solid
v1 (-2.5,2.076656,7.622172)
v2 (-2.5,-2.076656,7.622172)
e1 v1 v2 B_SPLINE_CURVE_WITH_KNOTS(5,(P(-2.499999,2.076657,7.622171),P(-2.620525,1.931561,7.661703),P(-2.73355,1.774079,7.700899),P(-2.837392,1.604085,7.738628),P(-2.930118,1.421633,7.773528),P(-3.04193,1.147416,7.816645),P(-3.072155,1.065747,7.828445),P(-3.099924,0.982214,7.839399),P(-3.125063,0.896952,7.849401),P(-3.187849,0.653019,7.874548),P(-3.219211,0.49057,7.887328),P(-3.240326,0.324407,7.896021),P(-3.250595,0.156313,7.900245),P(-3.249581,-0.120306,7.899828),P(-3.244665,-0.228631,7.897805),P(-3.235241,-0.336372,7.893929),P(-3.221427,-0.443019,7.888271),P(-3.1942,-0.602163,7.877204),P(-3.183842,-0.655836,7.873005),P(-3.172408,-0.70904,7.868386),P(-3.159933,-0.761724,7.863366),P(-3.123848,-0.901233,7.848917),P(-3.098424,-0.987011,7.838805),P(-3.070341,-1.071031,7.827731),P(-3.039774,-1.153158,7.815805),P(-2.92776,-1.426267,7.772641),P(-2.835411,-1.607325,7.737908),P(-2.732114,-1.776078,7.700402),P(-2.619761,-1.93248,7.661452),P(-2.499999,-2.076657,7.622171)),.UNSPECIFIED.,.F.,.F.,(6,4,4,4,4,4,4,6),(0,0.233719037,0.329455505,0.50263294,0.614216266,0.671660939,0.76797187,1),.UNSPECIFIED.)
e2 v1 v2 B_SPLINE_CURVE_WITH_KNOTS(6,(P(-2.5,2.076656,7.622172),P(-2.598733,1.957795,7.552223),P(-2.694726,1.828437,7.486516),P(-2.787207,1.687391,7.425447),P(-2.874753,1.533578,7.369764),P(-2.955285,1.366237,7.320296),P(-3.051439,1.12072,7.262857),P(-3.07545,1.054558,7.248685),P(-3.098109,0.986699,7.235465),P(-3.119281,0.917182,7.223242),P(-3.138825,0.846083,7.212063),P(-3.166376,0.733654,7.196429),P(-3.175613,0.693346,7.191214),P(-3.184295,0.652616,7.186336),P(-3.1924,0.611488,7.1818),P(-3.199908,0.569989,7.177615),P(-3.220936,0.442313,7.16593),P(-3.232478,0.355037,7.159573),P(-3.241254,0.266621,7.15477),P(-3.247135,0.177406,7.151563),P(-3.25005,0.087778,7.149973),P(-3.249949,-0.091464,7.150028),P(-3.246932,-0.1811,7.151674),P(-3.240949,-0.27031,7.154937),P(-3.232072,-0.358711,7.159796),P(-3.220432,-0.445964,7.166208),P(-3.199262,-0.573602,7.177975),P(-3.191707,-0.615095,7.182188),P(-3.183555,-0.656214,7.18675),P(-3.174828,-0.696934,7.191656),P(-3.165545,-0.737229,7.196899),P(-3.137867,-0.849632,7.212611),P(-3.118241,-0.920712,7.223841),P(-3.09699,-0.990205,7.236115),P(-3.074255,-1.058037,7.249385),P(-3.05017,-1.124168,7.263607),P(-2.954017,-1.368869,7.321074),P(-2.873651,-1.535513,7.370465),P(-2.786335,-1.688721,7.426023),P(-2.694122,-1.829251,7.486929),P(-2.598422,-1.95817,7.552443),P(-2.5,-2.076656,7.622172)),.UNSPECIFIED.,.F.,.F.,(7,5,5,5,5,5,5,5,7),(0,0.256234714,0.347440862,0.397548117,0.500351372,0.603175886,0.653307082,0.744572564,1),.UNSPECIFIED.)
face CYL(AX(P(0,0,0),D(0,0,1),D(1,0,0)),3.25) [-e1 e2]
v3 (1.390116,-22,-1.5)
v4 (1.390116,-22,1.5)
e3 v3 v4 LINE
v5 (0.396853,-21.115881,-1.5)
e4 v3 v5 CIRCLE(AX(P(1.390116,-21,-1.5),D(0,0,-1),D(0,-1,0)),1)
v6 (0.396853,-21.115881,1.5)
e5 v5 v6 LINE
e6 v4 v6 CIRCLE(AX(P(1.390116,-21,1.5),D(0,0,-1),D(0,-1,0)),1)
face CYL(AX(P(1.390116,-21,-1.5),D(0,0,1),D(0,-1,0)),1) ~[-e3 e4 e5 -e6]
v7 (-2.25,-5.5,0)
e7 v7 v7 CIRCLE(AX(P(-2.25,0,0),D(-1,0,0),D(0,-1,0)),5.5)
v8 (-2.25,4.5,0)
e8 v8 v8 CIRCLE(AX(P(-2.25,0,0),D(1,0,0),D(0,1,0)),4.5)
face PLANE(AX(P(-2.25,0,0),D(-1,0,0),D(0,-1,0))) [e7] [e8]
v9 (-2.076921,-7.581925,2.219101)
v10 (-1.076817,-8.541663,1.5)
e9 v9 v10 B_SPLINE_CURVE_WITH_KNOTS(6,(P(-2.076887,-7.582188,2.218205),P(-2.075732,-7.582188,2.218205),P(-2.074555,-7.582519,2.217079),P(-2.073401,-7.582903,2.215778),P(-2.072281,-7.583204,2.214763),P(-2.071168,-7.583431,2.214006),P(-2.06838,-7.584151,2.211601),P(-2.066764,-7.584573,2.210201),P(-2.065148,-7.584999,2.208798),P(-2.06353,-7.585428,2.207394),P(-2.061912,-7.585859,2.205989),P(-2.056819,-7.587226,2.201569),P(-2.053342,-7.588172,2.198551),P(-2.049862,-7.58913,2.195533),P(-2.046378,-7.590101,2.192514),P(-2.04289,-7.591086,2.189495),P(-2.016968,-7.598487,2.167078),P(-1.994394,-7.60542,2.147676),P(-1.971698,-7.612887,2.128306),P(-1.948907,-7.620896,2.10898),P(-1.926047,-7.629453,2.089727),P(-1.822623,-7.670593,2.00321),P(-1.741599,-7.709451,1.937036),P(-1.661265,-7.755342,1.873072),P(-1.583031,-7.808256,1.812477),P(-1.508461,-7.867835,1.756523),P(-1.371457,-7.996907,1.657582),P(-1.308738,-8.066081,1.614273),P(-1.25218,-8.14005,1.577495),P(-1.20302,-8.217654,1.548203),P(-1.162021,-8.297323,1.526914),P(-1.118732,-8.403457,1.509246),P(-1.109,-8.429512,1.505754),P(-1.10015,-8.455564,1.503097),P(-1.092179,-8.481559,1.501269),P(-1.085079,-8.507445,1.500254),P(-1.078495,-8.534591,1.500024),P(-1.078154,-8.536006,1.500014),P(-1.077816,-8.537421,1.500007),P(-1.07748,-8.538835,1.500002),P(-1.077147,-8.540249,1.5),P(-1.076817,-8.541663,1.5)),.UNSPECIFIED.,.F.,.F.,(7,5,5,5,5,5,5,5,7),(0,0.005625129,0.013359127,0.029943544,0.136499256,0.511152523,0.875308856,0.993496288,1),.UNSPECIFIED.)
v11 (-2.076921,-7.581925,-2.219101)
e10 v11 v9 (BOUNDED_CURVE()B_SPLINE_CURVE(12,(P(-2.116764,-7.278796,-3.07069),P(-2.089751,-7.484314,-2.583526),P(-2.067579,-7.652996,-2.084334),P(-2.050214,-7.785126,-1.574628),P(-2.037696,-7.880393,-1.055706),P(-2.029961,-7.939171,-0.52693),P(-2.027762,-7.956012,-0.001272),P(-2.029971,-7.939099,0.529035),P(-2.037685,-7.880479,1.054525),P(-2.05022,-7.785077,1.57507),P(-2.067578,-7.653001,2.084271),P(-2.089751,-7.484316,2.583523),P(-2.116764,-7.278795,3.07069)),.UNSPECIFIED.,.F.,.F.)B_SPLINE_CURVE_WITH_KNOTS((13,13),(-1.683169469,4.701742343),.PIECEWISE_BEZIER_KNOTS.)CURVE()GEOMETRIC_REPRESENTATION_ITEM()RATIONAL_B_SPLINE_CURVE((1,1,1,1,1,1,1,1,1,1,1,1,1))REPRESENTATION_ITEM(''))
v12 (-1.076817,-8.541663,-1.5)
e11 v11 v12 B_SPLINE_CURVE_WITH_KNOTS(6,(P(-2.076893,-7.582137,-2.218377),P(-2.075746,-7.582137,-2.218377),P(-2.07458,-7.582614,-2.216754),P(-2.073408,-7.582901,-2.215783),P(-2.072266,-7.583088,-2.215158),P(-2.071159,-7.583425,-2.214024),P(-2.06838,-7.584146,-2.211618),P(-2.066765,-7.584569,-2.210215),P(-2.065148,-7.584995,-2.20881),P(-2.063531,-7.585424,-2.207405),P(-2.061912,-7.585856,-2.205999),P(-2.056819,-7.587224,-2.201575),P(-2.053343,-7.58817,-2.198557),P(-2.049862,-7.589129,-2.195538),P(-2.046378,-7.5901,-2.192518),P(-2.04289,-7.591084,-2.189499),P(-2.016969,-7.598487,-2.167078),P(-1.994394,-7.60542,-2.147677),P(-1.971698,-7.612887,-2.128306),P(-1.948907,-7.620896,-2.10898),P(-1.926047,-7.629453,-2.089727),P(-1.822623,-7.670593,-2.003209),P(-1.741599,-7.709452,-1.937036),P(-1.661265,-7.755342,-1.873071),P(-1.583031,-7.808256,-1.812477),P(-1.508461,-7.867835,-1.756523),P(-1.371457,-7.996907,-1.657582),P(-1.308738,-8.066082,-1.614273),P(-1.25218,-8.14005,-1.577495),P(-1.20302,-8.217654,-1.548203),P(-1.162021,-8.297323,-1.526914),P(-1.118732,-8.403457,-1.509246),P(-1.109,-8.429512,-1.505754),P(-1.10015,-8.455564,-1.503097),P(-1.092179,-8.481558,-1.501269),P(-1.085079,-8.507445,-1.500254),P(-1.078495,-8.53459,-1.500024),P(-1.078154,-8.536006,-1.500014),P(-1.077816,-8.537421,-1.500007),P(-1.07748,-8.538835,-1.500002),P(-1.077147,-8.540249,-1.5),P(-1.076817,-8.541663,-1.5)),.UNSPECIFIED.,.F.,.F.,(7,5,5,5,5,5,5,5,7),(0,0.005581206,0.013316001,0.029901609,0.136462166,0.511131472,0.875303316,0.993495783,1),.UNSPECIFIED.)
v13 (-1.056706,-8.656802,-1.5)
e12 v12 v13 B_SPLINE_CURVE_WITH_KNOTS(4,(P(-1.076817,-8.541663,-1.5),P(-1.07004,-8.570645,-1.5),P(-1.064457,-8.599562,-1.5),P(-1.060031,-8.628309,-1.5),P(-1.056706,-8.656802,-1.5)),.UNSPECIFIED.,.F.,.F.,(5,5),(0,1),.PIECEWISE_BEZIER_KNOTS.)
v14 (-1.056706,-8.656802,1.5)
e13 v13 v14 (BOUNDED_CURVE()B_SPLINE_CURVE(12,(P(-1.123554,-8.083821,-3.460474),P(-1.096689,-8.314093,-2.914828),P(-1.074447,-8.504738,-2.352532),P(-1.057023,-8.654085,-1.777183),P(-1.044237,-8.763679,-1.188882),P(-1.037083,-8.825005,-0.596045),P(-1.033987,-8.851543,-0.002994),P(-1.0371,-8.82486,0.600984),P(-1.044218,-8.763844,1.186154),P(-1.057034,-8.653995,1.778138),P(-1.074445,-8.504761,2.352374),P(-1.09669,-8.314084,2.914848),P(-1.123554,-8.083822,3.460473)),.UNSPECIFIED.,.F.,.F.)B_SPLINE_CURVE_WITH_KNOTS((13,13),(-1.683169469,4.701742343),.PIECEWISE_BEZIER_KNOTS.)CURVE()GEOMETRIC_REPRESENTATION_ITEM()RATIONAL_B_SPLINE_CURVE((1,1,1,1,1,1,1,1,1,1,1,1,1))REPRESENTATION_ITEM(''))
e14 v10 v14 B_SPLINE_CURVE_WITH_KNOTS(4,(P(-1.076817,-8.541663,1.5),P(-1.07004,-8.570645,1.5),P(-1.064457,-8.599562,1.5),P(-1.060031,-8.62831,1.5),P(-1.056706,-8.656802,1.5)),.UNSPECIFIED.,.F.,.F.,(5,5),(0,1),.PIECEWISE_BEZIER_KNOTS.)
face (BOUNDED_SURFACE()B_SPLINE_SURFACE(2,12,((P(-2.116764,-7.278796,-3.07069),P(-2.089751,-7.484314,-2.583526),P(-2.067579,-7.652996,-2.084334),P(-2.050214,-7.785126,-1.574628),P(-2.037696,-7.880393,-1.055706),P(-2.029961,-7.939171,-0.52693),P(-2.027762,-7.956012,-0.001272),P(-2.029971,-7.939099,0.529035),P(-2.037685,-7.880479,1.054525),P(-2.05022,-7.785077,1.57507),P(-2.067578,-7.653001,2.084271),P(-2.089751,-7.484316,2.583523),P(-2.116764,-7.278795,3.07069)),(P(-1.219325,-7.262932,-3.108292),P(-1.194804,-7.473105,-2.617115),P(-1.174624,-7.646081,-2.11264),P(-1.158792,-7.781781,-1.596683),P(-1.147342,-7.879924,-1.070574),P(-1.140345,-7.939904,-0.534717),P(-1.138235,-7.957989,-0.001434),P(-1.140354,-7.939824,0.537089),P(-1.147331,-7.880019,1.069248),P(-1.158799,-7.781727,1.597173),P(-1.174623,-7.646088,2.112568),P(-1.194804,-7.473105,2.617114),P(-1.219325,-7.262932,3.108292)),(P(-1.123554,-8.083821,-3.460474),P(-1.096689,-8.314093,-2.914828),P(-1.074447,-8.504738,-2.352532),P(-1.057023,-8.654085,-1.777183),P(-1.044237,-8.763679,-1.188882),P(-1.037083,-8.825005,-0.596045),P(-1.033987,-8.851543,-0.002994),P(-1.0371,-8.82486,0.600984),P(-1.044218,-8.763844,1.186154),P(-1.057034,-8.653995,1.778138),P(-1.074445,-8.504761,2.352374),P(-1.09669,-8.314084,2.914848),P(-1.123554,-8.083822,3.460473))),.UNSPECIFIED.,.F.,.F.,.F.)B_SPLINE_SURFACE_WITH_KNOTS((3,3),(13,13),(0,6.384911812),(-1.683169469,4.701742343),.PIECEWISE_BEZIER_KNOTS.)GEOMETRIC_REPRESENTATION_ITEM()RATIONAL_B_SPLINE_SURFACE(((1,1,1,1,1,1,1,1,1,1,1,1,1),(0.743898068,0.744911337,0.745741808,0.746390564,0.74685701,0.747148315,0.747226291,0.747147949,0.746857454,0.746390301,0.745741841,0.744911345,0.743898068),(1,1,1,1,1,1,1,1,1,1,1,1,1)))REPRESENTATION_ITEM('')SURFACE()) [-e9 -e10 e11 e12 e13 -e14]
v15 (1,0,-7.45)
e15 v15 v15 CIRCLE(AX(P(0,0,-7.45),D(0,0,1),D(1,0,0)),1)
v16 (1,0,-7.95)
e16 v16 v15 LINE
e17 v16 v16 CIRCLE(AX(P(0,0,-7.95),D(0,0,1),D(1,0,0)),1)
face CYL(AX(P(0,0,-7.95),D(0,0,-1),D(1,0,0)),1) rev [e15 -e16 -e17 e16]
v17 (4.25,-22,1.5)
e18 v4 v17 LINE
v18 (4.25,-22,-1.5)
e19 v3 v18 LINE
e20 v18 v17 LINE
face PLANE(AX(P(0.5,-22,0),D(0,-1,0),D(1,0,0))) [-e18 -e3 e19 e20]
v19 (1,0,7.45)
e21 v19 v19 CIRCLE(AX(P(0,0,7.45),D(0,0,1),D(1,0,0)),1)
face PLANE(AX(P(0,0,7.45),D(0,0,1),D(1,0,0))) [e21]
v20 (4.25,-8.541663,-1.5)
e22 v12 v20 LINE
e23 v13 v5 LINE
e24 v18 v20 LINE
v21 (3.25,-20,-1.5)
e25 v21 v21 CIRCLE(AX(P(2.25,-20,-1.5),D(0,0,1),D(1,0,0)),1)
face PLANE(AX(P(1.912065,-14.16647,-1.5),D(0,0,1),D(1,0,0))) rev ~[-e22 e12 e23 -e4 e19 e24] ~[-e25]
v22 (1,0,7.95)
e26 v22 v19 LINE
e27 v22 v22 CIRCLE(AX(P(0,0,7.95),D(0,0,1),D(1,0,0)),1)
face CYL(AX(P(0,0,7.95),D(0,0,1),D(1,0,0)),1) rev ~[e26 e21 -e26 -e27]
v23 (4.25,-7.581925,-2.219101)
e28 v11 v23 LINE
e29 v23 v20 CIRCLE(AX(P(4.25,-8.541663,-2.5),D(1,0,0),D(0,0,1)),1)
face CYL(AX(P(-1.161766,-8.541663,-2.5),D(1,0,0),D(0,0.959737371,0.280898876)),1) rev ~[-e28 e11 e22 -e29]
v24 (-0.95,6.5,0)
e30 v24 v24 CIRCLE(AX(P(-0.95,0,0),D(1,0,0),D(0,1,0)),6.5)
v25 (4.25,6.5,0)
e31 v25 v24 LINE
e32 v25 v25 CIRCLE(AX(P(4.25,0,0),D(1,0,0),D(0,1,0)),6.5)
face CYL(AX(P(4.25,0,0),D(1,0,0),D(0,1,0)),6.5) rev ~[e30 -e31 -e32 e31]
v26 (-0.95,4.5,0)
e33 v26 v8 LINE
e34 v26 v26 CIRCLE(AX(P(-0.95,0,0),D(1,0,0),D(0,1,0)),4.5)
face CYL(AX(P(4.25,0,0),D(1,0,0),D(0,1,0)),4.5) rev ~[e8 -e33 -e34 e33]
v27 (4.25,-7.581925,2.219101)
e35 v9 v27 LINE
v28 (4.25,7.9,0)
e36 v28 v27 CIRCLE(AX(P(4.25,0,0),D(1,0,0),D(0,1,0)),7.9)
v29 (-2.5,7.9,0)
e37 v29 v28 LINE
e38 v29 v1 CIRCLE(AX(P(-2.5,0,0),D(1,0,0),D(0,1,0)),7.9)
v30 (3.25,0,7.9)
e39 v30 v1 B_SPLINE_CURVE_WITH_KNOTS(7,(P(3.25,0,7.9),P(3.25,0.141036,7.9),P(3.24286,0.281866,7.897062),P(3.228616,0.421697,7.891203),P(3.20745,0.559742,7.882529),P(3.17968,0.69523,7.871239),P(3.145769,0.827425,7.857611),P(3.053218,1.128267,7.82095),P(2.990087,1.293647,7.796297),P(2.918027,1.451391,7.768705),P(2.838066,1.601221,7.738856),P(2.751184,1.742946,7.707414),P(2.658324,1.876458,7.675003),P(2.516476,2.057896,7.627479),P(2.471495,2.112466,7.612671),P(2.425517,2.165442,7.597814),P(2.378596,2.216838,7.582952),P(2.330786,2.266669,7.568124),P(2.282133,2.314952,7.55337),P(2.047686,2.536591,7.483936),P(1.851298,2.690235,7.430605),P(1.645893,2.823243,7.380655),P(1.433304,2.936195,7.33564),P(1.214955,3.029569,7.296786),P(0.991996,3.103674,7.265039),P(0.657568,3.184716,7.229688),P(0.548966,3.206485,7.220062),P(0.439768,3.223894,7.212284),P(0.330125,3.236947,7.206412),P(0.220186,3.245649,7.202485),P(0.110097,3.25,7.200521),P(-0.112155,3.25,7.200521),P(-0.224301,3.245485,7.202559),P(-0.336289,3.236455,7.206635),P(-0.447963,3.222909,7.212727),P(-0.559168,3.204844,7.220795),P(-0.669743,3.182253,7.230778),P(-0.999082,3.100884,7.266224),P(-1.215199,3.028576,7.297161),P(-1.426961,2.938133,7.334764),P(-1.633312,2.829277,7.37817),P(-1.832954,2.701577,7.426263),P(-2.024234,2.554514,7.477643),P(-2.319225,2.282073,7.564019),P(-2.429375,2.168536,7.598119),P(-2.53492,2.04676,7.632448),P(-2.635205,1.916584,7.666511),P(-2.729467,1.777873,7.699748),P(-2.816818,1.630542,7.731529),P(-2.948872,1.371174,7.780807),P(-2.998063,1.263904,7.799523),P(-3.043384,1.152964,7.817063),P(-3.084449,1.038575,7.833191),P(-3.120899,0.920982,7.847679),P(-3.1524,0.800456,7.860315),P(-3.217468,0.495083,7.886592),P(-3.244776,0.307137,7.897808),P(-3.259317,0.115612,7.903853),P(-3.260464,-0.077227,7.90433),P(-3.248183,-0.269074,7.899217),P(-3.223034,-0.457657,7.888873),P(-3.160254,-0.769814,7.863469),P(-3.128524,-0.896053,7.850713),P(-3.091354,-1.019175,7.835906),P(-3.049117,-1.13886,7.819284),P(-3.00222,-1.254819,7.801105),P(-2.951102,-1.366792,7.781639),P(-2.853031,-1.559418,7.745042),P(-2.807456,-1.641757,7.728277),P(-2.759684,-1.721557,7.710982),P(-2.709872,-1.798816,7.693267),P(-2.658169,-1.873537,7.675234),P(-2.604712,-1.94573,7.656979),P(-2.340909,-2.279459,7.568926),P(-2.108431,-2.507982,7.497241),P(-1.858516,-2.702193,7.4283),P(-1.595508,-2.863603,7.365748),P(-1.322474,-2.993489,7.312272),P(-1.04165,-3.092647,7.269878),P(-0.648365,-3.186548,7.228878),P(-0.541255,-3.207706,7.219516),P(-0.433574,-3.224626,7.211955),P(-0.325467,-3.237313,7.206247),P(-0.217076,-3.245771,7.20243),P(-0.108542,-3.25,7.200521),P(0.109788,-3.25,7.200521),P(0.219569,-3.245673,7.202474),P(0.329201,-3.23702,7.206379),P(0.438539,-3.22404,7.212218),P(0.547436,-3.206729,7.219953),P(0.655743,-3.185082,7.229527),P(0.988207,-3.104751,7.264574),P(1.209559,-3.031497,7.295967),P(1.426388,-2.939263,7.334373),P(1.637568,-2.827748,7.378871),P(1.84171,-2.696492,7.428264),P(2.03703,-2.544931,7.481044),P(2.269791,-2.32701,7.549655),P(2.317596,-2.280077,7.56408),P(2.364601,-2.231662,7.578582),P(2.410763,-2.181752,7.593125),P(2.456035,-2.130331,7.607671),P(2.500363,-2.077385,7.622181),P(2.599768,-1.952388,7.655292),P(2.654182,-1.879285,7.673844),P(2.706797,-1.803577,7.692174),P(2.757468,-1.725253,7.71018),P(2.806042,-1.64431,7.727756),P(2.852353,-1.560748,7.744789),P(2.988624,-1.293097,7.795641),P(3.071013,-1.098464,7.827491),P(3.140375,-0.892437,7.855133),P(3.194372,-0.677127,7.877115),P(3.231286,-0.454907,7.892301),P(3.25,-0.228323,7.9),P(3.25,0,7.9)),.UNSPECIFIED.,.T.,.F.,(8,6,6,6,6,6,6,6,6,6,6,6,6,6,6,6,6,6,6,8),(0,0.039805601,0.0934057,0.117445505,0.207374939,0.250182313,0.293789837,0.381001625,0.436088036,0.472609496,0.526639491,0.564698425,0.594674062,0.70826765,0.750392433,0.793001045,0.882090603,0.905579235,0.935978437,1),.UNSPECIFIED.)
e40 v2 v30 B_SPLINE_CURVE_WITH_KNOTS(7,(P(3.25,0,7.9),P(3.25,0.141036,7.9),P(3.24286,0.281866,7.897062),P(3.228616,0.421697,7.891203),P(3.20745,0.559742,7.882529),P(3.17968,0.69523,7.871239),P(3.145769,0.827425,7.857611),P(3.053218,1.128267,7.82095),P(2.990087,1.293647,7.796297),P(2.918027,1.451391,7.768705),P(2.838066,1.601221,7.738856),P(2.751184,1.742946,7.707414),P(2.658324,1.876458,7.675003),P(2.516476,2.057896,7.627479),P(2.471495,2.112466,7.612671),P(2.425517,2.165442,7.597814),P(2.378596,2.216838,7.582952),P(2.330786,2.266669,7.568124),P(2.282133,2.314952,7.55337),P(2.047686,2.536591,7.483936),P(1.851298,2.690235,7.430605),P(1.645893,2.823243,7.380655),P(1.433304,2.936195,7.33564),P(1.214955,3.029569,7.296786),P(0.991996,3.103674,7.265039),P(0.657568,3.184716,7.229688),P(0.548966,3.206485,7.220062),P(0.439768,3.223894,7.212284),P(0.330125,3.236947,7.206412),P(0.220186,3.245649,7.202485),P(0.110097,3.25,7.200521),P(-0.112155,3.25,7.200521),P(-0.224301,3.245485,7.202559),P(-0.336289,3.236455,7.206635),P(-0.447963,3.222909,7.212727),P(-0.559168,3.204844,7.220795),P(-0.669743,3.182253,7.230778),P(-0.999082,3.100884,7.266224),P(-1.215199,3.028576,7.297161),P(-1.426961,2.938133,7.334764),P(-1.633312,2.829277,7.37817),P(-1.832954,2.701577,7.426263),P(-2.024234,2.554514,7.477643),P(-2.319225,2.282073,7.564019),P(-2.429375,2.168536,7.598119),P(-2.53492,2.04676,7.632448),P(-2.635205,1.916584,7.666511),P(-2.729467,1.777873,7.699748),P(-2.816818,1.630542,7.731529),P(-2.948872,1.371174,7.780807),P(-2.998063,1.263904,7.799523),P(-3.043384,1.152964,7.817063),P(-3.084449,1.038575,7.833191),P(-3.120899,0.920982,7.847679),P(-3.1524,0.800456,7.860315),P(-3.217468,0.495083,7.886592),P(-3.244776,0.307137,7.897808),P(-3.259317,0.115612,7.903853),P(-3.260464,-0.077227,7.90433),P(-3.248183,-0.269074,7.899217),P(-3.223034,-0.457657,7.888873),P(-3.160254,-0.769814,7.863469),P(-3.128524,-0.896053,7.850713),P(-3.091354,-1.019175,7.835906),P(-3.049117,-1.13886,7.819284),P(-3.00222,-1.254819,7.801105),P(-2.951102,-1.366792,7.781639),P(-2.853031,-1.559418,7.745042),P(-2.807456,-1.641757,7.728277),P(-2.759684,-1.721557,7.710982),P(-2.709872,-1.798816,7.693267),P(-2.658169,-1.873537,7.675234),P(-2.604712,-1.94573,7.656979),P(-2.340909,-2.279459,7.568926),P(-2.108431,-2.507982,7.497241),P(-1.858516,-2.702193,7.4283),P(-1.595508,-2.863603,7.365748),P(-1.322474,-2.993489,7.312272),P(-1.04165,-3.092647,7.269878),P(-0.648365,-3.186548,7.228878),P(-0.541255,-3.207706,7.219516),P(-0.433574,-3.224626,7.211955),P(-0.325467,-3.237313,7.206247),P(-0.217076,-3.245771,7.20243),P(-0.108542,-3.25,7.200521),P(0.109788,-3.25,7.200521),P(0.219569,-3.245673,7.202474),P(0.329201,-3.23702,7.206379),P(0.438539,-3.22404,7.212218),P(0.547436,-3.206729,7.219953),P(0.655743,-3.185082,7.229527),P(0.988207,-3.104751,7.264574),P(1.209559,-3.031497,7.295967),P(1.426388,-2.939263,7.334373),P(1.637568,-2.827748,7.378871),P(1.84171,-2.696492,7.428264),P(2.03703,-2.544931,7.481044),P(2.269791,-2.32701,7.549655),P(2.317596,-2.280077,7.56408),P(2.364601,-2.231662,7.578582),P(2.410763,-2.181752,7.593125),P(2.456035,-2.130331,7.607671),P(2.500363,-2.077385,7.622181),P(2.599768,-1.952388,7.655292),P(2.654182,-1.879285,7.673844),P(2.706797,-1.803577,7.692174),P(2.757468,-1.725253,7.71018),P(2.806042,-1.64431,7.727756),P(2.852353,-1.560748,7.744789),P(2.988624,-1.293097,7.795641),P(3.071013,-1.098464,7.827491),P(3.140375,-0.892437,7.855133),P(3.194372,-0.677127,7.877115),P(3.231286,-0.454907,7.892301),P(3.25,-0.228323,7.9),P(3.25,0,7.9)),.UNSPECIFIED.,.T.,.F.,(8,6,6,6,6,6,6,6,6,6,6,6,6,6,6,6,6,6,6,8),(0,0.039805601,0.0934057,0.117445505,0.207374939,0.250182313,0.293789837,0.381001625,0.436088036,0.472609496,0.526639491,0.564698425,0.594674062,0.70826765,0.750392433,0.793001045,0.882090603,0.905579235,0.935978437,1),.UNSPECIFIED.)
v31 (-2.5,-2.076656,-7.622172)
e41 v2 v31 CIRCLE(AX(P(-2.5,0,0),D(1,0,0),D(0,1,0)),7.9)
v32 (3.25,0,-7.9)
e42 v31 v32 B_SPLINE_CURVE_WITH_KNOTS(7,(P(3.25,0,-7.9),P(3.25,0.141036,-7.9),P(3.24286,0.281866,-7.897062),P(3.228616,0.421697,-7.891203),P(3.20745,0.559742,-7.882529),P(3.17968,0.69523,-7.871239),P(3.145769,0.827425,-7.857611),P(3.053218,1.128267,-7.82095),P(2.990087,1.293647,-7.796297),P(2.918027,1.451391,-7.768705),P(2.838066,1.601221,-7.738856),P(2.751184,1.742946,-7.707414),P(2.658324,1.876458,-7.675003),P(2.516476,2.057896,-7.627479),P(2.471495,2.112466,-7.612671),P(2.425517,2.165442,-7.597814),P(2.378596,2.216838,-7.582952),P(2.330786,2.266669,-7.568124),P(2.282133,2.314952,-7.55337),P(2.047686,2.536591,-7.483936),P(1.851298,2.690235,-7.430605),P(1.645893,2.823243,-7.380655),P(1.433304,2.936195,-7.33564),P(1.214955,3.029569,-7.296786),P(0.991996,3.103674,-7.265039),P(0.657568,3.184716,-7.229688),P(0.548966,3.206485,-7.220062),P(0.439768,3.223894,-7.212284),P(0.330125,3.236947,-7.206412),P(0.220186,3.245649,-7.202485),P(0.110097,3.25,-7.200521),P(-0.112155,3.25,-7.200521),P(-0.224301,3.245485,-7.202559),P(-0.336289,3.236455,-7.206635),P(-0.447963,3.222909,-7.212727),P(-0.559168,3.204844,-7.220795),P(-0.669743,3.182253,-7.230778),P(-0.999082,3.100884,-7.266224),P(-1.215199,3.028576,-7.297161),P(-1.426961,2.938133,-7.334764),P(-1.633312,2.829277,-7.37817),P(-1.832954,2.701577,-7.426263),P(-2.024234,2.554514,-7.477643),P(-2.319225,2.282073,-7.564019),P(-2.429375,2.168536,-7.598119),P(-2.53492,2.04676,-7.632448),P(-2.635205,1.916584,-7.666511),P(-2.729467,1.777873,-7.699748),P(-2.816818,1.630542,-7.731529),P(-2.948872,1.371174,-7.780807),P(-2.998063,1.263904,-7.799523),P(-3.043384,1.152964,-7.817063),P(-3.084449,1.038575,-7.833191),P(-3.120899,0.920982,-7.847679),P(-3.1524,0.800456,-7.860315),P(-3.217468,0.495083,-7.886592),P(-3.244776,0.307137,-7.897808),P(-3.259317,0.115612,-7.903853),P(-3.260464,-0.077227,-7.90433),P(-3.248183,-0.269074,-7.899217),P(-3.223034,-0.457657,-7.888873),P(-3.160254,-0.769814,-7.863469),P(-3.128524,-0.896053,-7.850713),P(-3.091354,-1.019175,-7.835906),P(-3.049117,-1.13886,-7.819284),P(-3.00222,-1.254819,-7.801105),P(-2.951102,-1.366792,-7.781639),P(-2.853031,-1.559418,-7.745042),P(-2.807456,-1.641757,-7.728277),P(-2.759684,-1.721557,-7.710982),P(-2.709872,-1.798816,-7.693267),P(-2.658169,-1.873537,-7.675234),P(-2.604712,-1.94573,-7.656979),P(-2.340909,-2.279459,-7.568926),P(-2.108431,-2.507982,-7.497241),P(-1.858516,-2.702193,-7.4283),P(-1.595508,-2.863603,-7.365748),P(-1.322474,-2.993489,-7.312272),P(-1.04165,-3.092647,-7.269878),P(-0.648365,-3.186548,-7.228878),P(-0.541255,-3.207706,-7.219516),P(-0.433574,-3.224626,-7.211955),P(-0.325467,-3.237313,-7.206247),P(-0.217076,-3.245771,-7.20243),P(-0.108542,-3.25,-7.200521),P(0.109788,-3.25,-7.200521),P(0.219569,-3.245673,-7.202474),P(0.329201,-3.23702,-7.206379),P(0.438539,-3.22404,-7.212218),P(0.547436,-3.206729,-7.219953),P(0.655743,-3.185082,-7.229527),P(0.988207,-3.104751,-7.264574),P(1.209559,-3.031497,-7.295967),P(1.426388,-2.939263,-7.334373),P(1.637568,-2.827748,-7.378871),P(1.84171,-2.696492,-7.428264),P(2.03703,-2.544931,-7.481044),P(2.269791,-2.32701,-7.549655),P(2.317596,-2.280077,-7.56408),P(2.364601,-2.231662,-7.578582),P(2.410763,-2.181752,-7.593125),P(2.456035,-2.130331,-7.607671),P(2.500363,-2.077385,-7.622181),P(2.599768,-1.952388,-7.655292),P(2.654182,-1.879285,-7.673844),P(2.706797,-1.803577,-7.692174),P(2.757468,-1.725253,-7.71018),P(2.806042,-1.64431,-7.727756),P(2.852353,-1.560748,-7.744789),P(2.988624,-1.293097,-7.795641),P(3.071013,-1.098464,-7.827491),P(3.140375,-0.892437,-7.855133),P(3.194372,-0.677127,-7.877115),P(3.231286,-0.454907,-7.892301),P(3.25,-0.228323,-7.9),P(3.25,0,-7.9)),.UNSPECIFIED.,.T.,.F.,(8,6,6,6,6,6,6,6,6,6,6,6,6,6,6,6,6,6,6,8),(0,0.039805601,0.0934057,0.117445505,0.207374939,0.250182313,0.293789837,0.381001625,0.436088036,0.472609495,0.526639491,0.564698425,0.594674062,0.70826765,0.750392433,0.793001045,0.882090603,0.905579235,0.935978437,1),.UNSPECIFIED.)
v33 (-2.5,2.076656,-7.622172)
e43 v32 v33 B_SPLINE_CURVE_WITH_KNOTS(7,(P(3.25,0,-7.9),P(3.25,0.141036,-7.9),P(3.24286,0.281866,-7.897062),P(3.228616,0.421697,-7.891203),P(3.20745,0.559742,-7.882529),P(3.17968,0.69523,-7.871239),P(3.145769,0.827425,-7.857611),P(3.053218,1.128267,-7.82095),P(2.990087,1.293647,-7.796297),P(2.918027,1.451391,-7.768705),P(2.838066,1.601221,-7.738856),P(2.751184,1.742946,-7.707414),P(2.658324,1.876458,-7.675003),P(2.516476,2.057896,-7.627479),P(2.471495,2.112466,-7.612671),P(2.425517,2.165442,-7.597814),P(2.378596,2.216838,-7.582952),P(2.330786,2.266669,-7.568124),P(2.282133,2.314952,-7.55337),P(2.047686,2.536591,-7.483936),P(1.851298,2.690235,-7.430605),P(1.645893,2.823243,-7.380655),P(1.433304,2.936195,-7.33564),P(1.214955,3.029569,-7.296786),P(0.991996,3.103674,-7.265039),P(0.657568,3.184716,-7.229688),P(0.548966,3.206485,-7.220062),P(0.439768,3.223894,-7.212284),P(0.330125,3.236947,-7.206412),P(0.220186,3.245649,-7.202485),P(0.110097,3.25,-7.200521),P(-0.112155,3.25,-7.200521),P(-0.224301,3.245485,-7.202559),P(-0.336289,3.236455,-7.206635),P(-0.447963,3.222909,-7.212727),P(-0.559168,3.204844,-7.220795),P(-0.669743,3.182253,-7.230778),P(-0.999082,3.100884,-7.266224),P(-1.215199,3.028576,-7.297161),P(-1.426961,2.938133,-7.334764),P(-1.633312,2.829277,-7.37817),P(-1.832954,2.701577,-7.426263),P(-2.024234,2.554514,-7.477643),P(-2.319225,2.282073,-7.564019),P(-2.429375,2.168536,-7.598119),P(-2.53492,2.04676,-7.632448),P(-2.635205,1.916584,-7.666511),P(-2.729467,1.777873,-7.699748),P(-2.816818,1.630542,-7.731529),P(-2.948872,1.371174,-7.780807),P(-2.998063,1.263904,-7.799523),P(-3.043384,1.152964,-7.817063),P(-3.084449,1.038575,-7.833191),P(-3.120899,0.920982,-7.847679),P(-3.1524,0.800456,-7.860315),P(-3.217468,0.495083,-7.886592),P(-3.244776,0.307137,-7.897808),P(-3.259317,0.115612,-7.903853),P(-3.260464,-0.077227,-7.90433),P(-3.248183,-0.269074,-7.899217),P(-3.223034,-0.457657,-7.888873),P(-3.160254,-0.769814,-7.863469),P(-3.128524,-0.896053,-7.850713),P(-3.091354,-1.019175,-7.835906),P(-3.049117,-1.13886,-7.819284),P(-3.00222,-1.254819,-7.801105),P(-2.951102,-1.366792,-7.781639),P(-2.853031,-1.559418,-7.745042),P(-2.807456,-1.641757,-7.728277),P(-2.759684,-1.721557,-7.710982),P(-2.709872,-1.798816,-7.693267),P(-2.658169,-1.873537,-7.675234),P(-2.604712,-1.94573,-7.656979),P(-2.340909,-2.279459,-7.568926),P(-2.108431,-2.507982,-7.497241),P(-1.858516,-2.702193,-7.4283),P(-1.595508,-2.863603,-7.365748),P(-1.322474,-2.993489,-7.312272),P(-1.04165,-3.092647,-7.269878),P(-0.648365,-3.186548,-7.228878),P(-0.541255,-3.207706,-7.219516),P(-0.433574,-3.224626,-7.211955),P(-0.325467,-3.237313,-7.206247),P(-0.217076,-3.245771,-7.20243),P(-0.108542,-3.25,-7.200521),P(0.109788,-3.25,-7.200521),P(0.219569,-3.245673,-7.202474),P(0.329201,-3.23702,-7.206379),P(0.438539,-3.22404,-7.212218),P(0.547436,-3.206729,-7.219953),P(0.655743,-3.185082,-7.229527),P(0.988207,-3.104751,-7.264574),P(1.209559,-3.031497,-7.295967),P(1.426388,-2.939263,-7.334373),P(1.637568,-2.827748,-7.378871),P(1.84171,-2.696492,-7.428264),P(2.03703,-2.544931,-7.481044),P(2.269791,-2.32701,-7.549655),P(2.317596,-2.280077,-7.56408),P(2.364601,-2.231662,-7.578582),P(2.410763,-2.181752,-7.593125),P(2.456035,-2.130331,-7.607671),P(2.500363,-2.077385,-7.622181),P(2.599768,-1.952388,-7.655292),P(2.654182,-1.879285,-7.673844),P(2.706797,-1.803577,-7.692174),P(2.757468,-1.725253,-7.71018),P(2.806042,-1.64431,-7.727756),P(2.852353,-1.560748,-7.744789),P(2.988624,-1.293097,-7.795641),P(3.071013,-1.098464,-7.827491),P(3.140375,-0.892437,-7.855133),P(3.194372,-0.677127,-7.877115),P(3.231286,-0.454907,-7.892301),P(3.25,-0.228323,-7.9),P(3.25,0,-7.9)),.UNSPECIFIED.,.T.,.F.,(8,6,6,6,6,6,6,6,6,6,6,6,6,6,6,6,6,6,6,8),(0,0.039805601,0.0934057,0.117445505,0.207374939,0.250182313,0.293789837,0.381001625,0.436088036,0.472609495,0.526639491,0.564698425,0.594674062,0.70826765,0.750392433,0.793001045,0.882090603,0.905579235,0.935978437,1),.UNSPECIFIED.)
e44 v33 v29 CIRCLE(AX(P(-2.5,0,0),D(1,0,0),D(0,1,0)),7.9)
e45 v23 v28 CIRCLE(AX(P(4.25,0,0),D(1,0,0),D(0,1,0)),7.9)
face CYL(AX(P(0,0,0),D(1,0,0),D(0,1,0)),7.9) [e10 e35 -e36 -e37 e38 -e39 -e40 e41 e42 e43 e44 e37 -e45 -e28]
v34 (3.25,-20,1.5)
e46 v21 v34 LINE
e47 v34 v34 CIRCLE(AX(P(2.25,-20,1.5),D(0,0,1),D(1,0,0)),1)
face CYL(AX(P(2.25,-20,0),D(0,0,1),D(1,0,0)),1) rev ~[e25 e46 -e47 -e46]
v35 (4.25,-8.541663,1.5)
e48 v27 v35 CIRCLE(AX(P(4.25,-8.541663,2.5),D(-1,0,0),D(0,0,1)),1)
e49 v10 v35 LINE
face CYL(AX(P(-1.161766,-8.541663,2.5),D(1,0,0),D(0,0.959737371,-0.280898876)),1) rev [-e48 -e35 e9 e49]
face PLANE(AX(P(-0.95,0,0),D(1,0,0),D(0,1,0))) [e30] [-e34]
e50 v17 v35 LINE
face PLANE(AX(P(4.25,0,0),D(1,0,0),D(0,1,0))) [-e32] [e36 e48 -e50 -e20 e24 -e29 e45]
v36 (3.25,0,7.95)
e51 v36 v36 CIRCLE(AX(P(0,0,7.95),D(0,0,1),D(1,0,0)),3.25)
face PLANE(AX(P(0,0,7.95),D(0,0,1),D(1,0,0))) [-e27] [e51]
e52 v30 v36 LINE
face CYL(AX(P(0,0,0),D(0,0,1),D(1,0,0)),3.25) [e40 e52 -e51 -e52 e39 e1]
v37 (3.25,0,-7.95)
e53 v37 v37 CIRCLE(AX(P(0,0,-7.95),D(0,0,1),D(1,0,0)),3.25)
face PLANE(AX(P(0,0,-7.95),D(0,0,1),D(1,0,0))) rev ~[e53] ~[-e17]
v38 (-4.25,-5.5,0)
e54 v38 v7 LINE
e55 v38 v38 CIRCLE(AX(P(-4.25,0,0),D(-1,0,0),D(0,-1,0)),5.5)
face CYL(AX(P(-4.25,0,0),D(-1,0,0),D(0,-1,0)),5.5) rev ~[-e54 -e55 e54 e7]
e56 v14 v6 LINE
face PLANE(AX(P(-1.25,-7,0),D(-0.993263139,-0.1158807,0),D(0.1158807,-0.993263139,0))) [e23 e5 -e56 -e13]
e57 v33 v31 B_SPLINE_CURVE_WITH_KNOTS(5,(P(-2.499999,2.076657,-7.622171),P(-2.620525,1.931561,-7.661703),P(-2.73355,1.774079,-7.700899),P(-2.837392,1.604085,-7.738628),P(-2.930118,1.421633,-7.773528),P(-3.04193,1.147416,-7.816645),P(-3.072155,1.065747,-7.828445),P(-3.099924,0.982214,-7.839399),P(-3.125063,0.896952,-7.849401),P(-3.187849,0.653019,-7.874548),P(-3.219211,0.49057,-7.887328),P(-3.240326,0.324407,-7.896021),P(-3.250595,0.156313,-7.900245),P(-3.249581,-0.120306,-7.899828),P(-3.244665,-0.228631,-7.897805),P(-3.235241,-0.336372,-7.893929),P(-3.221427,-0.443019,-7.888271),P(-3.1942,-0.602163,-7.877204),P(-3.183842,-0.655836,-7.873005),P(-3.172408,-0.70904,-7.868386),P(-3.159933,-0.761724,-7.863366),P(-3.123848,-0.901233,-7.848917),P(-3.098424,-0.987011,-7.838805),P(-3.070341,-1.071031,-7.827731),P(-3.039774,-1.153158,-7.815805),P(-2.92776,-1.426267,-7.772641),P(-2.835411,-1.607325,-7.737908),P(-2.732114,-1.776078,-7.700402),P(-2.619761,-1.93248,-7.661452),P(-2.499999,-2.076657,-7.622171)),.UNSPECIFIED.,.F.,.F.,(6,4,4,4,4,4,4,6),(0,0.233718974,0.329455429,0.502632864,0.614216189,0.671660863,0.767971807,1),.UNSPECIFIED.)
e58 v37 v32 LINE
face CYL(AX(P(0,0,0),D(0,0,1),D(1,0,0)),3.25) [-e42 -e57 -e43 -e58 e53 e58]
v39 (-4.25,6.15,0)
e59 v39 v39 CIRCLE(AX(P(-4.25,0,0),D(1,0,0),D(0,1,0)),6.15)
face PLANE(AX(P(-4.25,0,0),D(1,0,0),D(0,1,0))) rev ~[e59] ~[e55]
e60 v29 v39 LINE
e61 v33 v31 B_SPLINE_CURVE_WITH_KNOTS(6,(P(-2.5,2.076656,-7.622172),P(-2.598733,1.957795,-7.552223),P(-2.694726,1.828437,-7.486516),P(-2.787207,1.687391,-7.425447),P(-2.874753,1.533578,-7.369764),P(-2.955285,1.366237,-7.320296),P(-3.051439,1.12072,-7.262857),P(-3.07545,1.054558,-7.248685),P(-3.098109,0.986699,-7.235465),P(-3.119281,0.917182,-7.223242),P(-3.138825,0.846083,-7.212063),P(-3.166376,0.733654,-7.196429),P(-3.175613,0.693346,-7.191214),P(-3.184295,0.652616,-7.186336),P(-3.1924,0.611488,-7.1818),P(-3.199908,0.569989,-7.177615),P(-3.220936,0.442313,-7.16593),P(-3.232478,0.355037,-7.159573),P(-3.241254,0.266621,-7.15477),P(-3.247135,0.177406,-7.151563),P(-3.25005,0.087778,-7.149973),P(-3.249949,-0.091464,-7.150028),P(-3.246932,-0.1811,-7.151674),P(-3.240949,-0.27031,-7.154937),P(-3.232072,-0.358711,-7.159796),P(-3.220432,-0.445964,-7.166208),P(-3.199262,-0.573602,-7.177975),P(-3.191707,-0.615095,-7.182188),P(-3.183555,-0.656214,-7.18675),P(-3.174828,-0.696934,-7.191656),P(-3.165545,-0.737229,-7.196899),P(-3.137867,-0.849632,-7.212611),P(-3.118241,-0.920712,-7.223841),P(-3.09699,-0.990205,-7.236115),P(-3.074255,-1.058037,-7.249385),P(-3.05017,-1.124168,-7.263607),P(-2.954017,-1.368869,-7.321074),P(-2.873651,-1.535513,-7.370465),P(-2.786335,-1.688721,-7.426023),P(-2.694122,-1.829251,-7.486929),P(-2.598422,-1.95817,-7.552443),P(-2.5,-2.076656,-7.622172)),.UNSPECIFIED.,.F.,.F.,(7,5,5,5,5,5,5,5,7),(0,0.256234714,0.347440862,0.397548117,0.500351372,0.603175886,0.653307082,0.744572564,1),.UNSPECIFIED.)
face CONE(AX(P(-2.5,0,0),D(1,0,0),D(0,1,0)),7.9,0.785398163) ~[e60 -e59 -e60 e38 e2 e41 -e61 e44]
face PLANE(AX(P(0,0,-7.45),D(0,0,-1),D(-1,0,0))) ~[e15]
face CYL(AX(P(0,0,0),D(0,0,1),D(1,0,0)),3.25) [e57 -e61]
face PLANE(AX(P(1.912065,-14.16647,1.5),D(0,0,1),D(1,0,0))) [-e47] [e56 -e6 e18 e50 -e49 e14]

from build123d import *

# Parameters (mm, degrees)
F0_R         = 7.9
F1_DEPTH     = 4.25
F2_R         = 3.25
F3_DEPTH     = 7.95
F4_R         = 6.5
F5_DEPTH     = 5.2
F6_R         = 5.5
F7_DEPTH     = 2
F8_R         = 4.5
F9_DEPTH     = 8.5010001
F10_S5_R     = 3.25
F10_T6_DEPTH = 13
F12_DEPTH    = 1.5
F13_R        = 1
F14_R        = 1
F15_DEPTH    = 0.5
F16_R        = 1
F17_DEPTH    = 4
F18_R        = 1


# Not quite as in the source:
# - a fillet or chamfer that OpenCascade refuses, or shapes differently, is made with other operations: its cross-section is extruded or revolved along the edge and cut away or added
# - a pattern or mirror of a feature is missing from the dataset's text; its kind, count and spacing are read off the source's solid


with BuildPart() as f1:
    # F0 (on Right) → F1 (new body, symmetric)
    with BuildSketch(Plane.YZ):
        Circle(F0_R)
    extrude(amount=F1_DEPTH, both=True)

    # F2 (on Top) → F3 (join, symmetric)
    with BuildSketch(Plane.XY):
        Circle(F2_R)
    extrude(amount=F3_DEPTH, both=True)

    # F4 (on face) → F5 (cut)
    with BuildSketch(Plane.YZ.offset(4.25)):
        Circle(F4_R)
    extrude(amount=-F5_DEPTH, mode=Mode.SUBTRACT)

    # F6 (on face) → F7 (cut)
    with BuildSketch(Plane(origin=(-4.25, 0, 0), x_dir=(0, -1, 0), z_dir=(-1, 0, 0))):
        Circle(F6_R)
    extrude(amount=-F7_DEPTH, mode=Mode.SUBTRACT)

    # F8 (on face) → F9 (cut, through all)
    with BuildSketch(Plane.YZ.offset(4.25)):
        Circle(F8_R)
    extrude(amount=-F9_DEPTH, mode=Mode.SUBTRACT)

    # F10: chamfer of 1.75 on 1 edges, made by hand


with BuildPart() as f10_tool2:
    # F10_s3 → F10_t4 (revolve)
    with BuildSketch(Plane.XY):
        Polygon((-2.5, 7.9), (-4.25, 6.15), (-4.25, 7.9), align=None)
    revolve(axis=Axis((-4.25, 0, 0), (1, 0, 0)))

    # F10_s5 → F10_t6 (cut, symmetric)
    with BuildSketch(Plane.XY):
        Circle(F10_S5_R)
    extrude(amount=F10_T6_DEPTH, both=True, mode=Mode.SUBTRACT)


with BuildPart() as f1_1:
    add(f1.part)

    # F10_t1: cut F10_tool2
    add(f10_tool2.part, mode=Mode.SUBTRACT)

    # F11 (on Top) → F12 (join, symmetric)
    with BuildSketch(Plane.XY):
        Polygon((-1.25, -7), (0.5, -22), (4.25, -22), (4.25, -7), align=None)
    extrude(amount=F12_DEPTH, both=True)

    # F13
    f13_edges = [f1_1.edges().sort_by_distance(p)[0] for p in [
        (-1.145, -7.9, 0),
        (1.544117, -7.756288, 1.5),
        (1.544117, -7.756288, -1.5),
    ]]
    fillet(f13_edges, radius=F13_R)

    # F14 (on face) → F15 (cut)
    with BuildSketch(Plane.XY.offset(7.95)):
        Circle(F14_R)
    f15 = extrude(amount=-F15_DEPTH, mode=Mode.SUBTRACT)

    # F15_copies: F15 across plane
    add(f15.mirror(Plane(origin=(0, 0, 0), x_dir=(-1, 0, 0), z_dir=(0, 0, -1))), mode=Mode.SUBTRACT)

    # F16 (on Top) → F17 (cut, symmetric)
    with BuildSketch(Plane.XY):
        with Locations((2.25, -20)):
            Circle(F16_R)
    extrude(amount=F17_DEPTH, both=True, mode=Mode.SUBTRACT)

    # F18
    f18_edges = [f1_1.edges().sort_by_distance(p)[0] for p in [
        (0.5, -22, 0),
    ]]
    fillet(f18_edges, radius=F18_R)


solid = f1_1.part
